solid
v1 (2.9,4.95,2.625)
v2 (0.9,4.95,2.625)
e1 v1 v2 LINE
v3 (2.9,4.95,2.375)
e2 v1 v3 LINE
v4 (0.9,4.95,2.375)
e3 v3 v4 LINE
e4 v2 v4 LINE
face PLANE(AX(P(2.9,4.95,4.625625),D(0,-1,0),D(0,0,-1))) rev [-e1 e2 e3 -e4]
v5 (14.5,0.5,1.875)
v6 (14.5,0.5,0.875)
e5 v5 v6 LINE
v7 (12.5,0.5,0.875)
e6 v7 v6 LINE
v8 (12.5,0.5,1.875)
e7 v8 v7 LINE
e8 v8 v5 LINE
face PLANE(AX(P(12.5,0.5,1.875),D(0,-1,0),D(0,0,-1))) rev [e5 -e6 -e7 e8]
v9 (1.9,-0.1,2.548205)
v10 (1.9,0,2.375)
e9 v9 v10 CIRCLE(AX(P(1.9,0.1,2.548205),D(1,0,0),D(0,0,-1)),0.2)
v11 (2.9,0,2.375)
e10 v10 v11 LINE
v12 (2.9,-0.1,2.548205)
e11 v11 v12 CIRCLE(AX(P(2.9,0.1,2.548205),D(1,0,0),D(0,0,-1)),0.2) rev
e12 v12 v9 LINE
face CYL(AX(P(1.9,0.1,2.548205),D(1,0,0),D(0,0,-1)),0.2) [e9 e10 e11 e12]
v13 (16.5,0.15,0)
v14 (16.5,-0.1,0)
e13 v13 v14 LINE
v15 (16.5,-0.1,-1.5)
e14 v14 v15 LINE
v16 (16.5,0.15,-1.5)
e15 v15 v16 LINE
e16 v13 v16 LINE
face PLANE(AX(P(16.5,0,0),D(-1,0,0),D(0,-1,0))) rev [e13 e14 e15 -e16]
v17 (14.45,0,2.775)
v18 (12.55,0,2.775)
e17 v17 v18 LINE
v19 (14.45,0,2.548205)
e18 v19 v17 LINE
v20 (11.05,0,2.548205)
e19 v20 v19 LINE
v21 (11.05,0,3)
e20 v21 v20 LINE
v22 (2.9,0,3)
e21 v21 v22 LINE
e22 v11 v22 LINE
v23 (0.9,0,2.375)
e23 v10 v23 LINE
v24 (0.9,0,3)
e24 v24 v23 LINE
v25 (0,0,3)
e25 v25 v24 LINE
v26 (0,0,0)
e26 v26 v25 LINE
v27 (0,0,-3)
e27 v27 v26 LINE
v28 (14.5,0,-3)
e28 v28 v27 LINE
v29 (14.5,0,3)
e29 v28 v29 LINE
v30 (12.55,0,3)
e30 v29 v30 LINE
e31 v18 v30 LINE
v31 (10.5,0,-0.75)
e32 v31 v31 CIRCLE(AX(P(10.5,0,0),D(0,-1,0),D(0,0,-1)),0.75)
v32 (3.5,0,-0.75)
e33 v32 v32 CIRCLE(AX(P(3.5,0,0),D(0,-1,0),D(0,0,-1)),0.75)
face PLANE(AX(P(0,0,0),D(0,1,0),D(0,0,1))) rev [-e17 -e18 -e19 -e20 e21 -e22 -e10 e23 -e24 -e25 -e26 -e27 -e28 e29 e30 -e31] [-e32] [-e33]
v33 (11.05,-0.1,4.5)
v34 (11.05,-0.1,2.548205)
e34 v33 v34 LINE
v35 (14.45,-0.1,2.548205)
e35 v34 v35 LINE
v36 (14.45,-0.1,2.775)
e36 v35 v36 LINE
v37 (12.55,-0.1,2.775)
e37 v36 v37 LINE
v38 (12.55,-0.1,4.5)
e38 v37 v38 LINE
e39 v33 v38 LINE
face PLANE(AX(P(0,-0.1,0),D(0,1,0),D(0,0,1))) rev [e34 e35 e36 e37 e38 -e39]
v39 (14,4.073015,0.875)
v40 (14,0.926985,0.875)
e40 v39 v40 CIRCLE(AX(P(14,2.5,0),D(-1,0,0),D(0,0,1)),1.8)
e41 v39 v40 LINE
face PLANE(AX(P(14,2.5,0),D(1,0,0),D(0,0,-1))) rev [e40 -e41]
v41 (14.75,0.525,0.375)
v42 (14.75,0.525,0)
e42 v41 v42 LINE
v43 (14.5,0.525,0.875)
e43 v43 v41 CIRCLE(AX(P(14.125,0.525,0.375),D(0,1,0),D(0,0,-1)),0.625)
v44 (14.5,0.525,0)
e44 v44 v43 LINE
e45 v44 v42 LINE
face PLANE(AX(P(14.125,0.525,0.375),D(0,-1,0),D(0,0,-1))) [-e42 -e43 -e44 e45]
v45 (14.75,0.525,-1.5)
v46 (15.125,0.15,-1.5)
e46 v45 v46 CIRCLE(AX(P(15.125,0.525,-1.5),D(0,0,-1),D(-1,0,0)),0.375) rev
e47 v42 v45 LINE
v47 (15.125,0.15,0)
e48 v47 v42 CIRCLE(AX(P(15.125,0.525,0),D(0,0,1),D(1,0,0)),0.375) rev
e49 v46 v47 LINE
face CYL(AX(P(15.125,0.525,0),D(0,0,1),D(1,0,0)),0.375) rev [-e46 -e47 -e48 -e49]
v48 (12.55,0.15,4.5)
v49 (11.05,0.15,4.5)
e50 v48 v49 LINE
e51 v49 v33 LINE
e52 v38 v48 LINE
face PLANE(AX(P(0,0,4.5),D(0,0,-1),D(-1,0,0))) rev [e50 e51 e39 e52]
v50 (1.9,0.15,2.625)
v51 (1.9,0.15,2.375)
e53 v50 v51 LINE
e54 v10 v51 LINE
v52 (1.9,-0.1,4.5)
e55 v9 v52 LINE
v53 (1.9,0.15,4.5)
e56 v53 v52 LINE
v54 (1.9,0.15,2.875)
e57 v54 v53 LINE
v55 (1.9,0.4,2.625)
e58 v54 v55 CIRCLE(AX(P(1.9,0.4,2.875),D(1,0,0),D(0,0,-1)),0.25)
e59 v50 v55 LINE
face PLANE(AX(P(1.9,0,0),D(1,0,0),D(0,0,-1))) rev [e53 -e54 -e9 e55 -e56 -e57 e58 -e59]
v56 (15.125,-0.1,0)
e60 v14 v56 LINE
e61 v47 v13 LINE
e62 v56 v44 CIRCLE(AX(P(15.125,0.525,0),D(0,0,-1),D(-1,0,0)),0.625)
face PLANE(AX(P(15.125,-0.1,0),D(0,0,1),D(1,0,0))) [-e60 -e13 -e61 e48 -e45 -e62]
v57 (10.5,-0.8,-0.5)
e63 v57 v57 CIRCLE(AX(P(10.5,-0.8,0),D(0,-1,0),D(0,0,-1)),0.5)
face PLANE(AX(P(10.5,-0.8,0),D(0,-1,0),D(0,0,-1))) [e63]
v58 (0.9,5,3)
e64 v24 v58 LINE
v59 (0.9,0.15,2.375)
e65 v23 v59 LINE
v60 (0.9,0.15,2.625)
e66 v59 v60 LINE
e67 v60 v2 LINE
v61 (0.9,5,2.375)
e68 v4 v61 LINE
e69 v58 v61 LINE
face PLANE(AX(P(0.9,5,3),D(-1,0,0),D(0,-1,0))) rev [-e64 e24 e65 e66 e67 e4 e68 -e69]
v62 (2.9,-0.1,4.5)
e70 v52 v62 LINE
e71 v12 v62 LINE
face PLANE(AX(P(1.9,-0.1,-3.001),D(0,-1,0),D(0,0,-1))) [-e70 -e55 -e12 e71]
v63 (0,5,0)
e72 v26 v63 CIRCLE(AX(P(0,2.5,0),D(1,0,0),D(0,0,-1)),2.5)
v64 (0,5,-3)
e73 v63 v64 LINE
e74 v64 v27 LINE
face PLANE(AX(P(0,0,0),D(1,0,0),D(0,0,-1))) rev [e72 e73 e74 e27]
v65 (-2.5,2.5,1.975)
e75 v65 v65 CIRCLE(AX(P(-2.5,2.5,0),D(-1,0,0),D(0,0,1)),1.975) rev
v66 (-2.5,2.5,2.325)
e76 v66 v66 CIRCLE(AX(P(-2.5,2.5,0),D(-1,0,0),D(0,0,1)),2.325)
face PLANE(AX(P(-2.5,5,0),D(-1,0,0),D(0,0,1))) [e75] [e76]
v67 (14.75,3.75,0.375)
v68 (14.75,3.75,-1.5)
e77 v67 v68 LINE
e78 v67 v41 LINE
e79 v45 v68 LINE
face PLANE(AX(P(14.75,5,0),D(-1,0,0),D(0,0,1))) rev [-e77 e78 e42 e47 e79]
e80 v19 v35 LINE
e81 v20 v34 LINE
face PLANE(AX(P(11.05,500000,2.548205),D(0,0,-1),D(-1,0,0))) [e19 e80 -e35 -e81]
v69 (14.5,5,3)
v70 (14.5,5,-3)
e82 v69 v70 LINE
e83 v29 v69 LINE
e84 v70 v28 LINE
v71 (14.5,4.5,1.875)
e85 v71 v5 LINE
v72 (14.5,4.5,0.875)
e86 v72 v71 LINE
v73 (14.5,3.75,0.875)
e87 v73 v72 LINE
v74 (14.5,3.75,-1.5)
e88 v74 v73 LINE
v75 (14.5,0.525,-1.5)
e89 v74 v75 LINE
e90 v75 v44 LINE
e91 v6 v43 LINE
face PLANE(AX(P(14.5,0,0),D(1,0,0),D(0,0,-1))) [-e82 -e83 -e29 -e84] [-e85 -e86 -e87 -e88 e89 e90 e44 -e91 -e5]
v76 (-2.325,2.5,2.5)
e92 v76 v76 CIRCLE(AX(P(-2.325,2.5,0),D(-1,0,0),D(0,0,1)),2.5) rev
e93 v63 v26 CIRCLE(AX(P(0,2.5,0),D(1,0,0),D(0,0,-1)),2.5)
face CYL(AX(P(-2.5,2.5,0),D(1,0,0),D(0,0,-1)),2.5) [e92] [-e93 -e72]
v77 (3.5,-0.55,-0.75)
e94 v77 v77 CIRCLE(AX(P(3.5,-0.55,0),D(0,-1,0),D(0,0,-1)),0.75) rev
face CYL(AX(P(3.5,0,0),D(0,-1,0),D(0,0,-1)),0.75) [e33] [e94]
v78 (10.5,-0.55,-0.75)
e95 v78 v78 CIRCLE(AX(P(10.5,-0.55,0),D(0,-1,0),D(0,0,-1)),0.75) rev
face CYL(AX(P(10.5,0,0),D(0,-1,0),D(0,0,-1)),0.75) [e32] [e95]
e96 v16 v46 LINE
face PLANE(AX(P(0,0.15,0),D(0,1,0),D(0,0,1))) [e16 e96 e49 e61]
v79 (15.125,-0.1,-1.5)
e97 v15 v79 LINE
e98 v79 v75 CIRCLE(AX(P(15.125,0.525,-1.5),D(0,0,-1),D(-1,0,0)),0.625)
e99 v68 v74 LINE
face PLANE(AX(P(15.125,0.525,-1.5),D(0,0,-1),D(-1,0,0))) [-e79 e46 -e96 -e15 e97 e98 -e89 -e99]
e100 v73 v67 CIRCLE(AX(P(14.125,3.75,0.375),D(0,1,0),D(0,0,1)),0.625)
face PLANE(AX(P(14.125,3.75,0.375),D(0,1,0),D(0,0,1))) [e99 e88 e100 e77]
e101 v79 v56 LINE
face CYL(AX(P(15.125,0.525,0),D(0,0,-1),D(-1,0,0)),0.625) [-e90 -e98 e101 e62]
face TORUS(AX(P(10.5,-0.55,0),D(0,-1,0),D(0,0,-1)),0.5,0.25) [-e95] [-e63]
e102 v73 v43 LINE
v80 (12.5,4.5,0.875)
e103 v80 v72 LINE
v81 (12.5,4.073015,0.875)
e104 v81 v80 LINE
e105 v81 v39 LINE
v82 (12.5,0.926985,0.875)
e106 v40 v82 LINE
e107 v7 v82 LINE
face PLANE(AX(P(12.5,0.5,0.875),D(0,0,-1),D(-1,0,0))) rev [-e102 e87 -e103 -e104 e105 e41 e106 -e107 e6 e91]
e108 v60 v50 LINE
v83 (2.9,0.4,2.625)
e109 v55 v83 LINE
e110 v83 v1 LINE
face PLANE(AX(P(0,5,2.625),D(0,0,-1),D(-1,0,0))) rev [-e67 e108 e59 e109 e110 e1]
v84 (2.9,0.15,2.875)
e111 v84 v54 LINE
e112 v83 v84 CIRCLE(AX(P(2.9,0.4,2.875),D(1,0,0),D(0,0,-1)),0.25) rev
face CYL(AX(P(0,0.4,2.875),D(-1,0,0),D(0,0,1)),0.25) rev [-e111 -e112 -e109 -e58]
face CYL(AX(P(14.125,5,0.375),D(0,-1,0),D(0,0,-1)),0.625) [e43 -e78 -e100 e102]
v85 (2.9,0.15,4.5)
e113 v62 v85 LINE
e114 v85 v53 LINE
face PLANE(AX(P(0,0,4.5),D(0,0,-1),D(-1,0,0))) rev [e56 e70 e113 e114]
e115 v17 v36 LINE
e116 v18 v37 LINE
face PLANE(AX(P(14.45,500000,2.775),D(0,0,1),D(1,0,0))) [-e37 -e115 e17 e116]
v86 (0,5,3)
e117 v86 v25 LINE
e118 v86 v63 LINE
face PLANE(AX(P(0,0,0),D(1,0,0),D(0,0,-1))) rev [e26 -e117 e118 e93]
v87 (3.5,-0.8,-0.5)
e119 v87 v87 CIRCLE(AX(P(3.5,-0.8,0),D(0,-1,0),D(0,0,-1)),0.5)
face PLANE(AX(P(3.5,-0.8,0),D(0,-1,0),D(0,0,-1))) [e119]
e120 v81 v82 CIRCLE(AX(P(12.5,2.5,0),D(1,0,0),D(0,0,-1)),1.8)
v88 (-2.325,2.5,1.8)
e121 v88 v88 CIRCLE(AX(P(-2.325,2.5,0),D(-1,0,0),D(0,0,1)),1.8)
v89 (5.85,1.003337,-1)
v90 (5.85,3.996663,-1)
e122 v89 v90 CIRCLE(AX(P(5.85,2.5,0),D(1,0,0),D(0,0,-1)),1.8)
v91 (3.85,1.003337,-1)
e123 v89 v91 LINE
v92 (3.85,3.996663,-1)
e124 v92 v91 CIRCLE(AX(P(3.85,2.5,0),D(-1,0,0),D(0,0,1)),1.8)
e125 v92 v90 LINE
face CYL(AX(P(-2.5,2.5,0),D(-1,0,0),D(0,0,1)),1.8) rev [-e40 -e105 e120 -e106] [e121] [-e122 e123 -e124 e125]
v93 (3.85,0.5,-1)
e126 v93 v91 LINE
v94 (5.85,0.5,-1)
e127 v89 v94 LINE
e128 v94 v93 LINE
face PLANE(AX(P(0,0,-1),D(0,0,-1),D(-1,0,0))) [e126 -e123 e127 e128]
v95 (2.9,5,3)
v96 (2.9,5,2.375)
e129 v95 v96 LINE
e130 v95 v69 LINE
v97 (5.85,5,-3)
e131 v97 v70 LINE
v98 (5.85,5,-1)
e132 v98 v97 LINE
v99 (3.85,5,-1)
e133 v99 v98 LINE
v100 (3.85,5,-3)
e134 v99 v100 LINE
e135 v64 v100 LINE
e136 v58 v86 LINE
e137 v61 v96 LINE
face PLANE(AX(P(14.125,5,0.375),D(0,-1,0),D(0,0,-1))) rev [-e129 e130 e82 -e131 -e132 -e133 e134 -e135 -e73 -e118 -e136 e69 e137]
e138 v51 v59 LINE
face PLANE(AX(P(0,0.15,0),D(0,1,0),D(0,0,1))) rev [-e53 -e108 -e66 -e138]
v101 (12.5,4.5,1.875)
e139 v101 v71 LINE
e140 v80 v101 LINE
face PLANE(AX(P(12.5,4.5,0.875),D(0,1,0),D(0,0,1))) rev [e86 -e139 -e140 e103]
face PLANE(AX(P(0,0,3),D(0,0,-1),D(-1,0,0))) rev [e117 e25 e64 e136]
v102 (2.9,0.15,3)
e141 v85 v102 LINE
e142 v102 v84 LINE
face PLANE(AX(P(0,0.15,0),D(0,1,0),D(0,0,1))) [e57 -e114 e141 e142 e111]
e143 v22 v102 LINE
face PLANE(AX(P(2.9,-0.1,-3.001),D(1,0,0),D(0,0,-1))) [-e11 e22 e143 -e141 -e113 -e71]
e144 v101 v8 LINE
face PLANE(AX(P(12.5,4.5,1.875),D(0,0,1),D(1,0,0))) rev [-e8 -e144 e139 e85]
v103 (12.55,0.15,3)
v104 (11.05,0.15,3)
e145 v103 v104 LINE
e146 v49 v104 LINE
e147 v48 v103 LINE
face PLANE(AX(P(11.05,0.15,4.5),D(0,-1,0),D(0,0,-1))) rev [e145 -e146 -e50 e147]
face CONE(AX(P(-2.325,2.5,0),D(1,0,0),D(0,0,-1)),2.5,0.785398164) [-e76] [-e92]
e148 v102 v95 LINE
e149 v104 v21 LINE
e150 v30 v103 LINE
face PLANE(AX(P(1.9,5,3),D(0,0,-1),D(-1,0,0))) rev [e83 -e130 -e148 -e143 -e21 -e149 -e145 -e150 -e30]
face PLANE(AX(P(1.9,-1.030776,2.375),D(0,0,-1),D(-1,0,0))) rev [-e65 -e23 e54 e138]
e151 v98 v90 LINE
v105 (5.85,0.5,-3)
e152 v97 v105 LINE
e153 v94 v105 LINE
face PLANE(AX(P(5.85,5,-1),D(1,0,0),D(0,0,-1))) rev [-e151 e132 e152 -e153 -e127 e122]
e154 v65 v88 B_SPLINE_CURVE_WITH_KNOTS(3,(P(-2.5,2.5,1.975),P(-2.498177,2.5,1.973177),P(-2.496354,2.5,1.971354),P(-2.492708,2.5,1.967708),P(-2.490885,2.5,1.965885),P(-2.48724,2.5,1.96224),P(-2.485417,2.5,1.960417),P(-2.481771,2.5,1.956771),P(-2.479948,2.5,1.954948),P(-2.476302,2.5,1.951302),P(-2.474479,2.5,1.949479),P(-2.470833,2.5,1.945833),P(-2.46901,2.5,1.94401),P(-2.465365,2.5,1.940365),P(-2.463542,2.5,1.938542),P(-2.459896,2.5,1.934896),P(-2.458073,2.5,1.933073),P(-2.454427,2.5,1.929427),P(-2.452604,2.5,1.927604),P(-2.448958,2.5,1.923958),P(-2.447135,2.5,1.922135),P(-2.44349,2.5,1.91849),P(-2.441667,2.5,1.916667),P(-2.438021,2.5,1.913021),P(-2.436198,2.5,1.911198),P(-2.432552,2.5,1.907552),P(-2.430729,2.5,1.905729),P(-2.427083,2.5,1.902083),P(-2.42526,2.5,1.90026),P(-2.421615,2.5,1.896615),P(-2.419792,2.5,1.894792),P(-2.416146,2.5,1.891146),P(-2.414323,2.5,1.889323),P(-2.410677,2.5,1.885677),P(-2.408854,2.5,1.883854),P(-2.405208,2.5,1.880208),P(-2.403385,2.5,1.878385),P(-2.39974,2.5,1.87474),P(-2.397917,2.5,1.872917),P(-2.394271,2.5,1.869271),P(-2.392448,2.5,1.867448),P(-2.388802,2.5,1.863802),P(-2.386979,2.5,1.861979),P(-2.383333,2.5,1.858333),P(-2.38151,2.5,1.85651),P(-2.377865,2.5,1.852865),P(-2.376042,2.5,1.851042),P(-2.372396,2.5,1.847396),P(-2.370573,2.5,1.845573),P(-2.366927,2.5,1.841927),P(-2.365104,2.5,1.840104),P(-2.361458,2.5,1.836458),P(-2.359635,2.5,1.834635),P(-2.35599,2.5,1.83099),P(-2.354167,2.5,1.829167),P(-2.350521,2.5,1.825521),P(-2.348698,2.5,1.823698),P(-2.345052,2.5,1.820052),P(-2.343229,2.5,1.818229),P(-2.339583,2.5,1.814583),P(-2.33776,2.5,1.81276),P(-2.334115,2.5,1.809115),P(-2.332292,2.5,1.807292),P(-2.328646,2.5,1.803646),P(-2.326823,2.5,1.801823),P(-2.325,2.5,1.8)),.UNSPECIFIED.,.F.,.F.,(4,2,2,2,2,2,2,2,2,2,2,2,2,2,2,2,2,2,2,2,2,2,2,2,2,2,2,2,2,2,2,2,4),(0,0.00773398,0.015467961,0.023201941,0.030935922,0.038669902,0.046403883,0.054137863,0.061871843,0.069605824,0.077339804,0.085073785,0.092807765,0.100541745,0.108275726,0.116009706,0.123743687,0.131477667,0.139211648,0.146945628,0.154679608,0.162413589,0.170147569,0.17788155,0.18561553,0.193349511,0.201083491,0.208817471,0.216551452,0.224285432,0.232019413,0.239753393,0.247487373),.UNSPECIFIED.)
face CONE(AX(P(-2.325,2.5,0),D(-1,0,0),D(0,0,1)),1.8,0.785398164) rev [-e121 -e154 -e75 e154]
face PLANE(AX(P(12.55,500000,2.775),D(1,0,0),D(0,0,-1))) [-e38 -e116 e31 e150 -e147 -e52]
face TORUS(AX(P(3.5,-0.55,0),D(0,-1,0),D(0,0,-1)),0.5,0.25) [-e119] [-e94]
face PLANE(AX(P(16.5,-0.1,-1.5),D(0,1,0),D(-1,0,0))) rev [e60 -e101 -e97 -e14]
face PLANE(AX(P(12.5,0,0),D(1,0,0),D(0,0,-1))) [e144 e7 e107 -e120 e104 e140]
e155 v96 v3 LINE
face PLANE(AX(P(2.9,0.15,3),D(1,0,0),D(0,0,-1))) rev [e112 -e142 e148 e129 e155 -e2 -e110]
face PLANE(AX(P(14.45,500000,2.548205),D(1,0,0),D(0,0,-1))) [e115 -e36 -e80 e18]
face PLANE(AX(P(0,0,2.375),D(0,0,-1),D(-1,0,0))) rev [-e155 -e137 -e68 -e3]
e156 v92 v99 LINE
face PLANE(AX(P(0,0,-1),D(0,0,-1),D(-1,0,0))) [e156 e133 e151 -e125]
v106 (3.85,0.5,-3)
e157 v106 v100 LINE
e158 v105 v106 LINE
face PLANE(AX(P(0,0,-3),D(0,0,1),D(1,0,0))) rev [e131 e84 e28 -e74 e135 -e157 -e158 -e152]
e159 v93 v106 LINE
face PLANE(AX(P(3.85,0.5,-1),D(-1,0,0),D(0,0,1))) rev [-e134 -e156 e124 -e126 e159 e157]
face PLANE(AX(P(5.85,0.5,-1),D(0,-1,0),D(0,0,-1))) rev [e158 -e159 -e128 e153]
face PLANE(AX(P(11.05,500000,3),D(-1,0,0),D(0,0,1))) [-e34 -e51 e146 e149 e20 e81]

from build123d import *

# Parameters (mm, degrees)
SKETCH1_W            = 0.625
SKETCH1_H            = 1.5
REVOLVE1_ANGLE       = 90
BOSS_EXTRUDE1_DEPTH  = 4.475
SKETCH3_W            = 4.5
SKETCH3_H            = 4.475
BOSS_EXTRUDE2_DEPTH  = 12.6
SKETCH4_W            = 12.6
SKETCH4_H            = 4.5
BOSS_EXTRUDE3_DEPTH  = 0.525
SKETCH5_W            = 1.5
SKETCH5_H            = 5.1
BOSS_EXTRUDE4_DEPTH  = 1.375
SKETCH6_W            = 1.75
SKETCH6_H            = 1.5
CUT_EXTRUDE1_DEPTH   = 4.475
SKETCH7_W            = 1.75
SKETCH7_H            = 1.5
CUT_EXTRUDE2_DEPTH   = 0.375
CUT_EXTRUDE3_START   = -1.25
CUT_EXTRUDE3_DEPTH   = 1.25
SKETCH9_W            = 12.6
SKETCH9_H            = 5
BOSS_EXTRUDE5_DEPTH  = 1.5
BOSS_EXTRUDE6_START  = 1.9
BOSS_EXTRUDE6_DEPTH  = 1
SKETCH11_W           = 5.625
SKETCH11_H           = 5
BOSS_EXTRUDE7_DEPTH  = 1.9
SKETCH12_W           = 0.9
SKETCH12_H           = 5
BOSS_EXTRUDE8_DEPTH  = 0.375
CUT_EXTRUDE4_REACH   = 19.458
SKETCH14_W           = 1
SKETCH14_H           = 0.25
SKETCH15_W           = 1
SKETCH15_H           = 0.375
CUT_EXTRUDE5_DEPTH   = 4.85
SKETCH16_W           = 1
SKETCH16_H           = 0.25
BOSS_EXTRUDE9_DEPTH  = 1.5
BOSS_EXTRUDE10_REACH = 19.847
SKETCH18_W           = 1.5
SKETCH18_H           = 0.25
BOSS_EXTRUDE11_DEPTH = 1.5
SKETCH19_W           = 1
SKETCH19_H           = 4
CUT_EXTRUDE6_DEPTH   = 2
CUT_EXTRUDE7_REACH   = 20.059
SKETCH21_W           = 2
SKETCH21_H           = 0.05
SKETCH22_W           = 2
SKETCH22_H           = 4.5
CUT_EXTRUDE8_DEPTH   = 2
SKETCH23_W           = 2.5
SKETCH23_H           = 2.5
SKETCH24_W           = 0.75
SKETCH24_H           = 0.8
SKETCH25_W           = 0.75
SKETCH25_H           = 0.8
HOLE1_D              = 3.6
HOLE1_DEPTH          = 16.5
CHAMFER1_SIZE        = 0.175
FILLET1_R            = 0.25
FILLET2_R            = 0.375


# Read off the part's stored shape, not the designer's step: Boss-Extrude6
with BuildPart() as part:
    # Sketch1 → Revolve1 (revolve)
    with BuildSketch(Plane(origin=(0, 0.525, 0), x_dir=(1, 0, 0), z_dir=(0, 1, 0))):
        with Locations((14.8125, 0.75)):
            Rectangle(SKETCH1_W, SKETCH1_H)
    revolve(axis=Axis((15.125, 0.525, 0), (0, 0, 1)), revolution_arc=REVOLVE1_ANGLE)

    # Sketch2 → Boss-Extrude1 (add)
    with BuildSketch(Plane(origin=(0, 0.525, 0), x_dir=(-1, 0, 0), z_dir=(0, 1, 0))):
        with BuildLine():
            Line((-14.5, -1.5), (-15.125, -1.5))
            Line((-15.125, -1.5), (-15.125, 0))
            Line((-15.125, 0), (-14.75, 0))
            Line((-14.75, 0), (-14.75, 0.375))
            ThreePointArc((-14.75, 0.375), (-14.684016994, 0.654508497), (-14.5, 0.875))
            Line((-14.5, 0.875), (-14.5, -1.5))
        make_face()
    extrude(amount=BOSS_EXTRUDE1_DEPTH)

    # Sketch3 → Boss-Extrude2 (add)
    with BuildSketch(Plane.ZY.offset(-14.5)):
        with Locations((0.75, 2.7625)):
            Rectangle(SKETCH3_W, SKETCH3_H)
    extrude(amount=BOSS_EXTRUDE2_DEPTH)

    # Sketch4 → Boss-Extrude3 (add)
    with BuildSketch(Plane.XZ.offset(-0.525)):
        with Locations((8.2, 0.75)):
            Rectangle(SKETCH4_W, SKETCH4_H)
    extrude(amount=BOSS_EXTRUDE3_DEPTH)

    # Sketch5 → Boss-Extrude4 (add)
    with BuildSketch(Plane(origin=(15.125, 0, 0), x_dir=(0, 0, -1), z_dir=(1, 0, 0))):
        with Locations((0.75, 2.45)):
            Rectangle(SKETCH5_W, SKETCH5_H)
    extrude(amount=BOSS_EXTRUDE4_DEPTH)

    # Sketch6 → Cut-Extrude1 (cut)
    with BuildSketch(Plane(origin=(0, 5, 0), x_dir=(-1, 0, 0), z_dir=(0, 1, 0))):
        with Locations((-15.625, -0.75)):
            Rectangle(SKETCH6_W, SKETCH6_H)
    extrude(amount=-CUT_EXTRUDE1_DEPTH, mode=Mode.SUBTRACT)

    # Sketch7 → Cut-Extrude2 (cut)
    with BuildSketch(Plane(origin=(0, 0.525, 0), x_dir=(-1, 0, 0), z_dir=(0, 1, 0))):
        with Locations((-15.625, -0.75)):
            Rectangle(SKETCH7_W, SKETCH7_H)
    extrude(amount=-CUT_EXTRUDE2_DEPTH, mode=Mode.SUBTRACT)

    # Sketch8 → Cut-Extrude3 (cut)
    with BuildSketch(Plane(origin=(0, 5, 0), x_dir=(-1, 0, 0), z_dir=(0, 1, 0)).offset(CUT_EXTRUDE3_START)):
        with BuildLine():
            Line((-14.75, -1.5), (-14.5, -1.5))
            Line((-14.5, -1.5), (-14.5, 0.875))
            ThreePointArc((-14.5, 0.875), (-14.684016994, 0.654508497), (-14.75, 0.375))
            Line((-14.75, 0.375), (-14.75, -1.5))
        make_face()
    extrude(amount=CUT_EXTRUDE3_DEPTH, mode=Mode.SUBTRACT)

    # Sketch9 → Boss-Extrude5 (add)
    with BuildSketch(Plane(origin=(0, 0, -1.5), x_dir=(-1, 0, 0), z_dir=(0, 0, -1))):
        with Locations((-8.2, 2.5)):
            Rectangle(SKETCH9_W, SKETCH9_H)
    extrude(amount=BOSS_EXTRUDE5_DEPTH)

    # Boss-Extrude6 outline → Boss-Extrude6 (add)
    with BuildSketch(Plane.YZ.offset(BOSS_EXTRUDE6_START)):
        with BuildLine():
            Line((0, 3), (-0.1, 3))
            Line((-0.1, 3), (-0.1, 2.548205081))
            ThreePointArc((-0.1, 2.548205081), (-0.073205081, 2.448205081), (0, 2.375))
            Line((0, 2.375), (0, 3))
        make_face()
    extrude(amount=BOSS_EXTRUDE6_DEPTH)

    # Sketch11 → Boss-Extrude7 (add)
    with BuildSketch(Plane.ZY.offset(-1.9)):
        with Locations((-0.1875, 2.5)):
            Rectangle(SKETCH11_W, SKETCH11_H)
    extrude(amount=BOSS_EXTRUDE7_DEPTH)

    # Sketch12 → Boss-Extrude8 (add)
    with BuildSketch(Plane.XY.offset(2.625)):
        with Locations((0.45, 2.5)):
            Rectangle(SKETCH12_W, SKETCH12_H)
    extrude(amount=BOSS_EXTRUDE8_DEPTH)

    # Sketch14 → Cut-Extrude4 (cut, up to next)
    with BuildSketch(Plane(origin=(0, 0.15, 0), x_dir=(1, 0, 0), z_dir=(0, 1, 0)), mode=Mode.PRIVATE) as cut_extrude4_sk1:
        with Locations((1.4, -2.5)):
            Rectangle(SKETCH14_W, SKETCH14_H)
    cut_extrude4_tool1 = extrude(cut_extrude4_sk1.sketch, amount=-CUT_EXTRUDE4_REACH, mode=Mode.PRIVATE) & part.part
    add(cut_extrude4_tool1.solids().sort_by_distance((1.4, 0.15, 2.5))[0], mode=Mode.SUBTRACT)

    # Sketch15 → Cut-Extrude5 (cut)
    with BuildSketch(Plane(origin=(0, 5, 0), x_dir=(-1, 0, 0), z_dir=(0, 1, 0))):
        with Locations((-2.4, 2.8125)):
            Rectangle(SKETCH15_W, SKETCH15_H)
    extrude(amount=-CUT_EXTRUDE5_DEPTH, mode=Mode.SUBTRACT)

    # Sketch16 → Boss-Extrude9 (add)
    with BuildSketch(Plane.XY.offset(3)):
        with Locations((2.4, 0.025)):
            Rectangle(SKETCH16_W, SKETCH16_H)
    extrude(amount=BOSS_EXTRUDE9_DEPTH)

    # Sketch17 → Boss-Extrude10 (add, up to next)
    with BuildSketch(Plane.XZ.offset(0.1), mode=Mode.PRIVATE) as boss_extrude10_sk1:
        Polygon((12.55, 2.775), (12.55, 3), (11.05, 3), (11.05, 2.548205081), (14.45, 2.548205081), (14.45, 2.775), align=None)
    boss_extrude10_tool1 = extrude(boss_extrude10_sk1.sketch, amount=-BOSS_EXTRUDE10_REACH, mode=Mode.PRIVATE) - part.part
    add(boss_extrude10_tool1.solids().sort_by_distance((12.460785, -0.1, 2.730374))[0])

    # Sketch18 → Boss-Extrude11 (add)
    with BuildSketch(Plane.XY.offset(3)):
        with Locations((11.8, 0.025)):
            Rectangle(SKETCH18_W, SKETCH18_H)
    extrude(amount=BOSS_EXTRUDE11_DEPTH)

    # Sketch19 → Cut-Extrude6 (cut)
    with BuildSketch(Plane(origin=(14.5, 0, 0), x_dir=(0, 0, -1), z_dir=(1, 0, 0))):
        with Locations((-1.375, 2.5)):
            Rectangle(SKETCH19_W, SKETCH19_H)
    extrude(amount=-CUT_EXTRUDE6_DEPTH, mode=Mode.SUBTRACT)

    # Sketch21 → Cut-Extrude7 (cut, up to next)
    with BuildSketch(Plane(origin=(0, 0, 2.375), x_dir=(-1, 0, 0), z_dir=(0, 0, -1)), mode=Mode.PRIVATE) as cut_extrude7_sk1:
        with Locations((-1.9, 4.975)):
            Rectangle(SKETCH21_W, SKETCH21_H)
    cut_extrude7_tool1 = extrude(cut_extrude7_sk1.sketch, amount=-CUT_EXTRUDE7_REACH, mode=Mode.PRIVATE) & part.part
    add(cut_extrude7_tool1.solids().sort_by_distance((1.9, 4.975, 2.375))[0], mode=Mode.SUBTRACT)

    # Sketch22 → Cut-Extrude8 (cut)
    with BuildSketch(Plane(origin=(0, 0, -3), x_dir=(-1, 0, 0), z_dir=(0, 0, -1))):
        with Locations((-4.85, 2.75)):
            Rectangle(SKETCH22_W, SKETCH22_H)
    extrude(amount=-CUT_EXTRUDE8_DEPTH, mode=Mode.SUBTRACT)

    # Sketch23 → Revolve2 (revolve)
    with BuildSketch(Plane.XY, mode=Mode.PRIVATE) as revolve2_sk:
        with Locations((-1.25, 3.75)):
            Rectangle(SKETCH23_W, SKETCH23_H)
    revolve(revolve2_sk.sketch.rotate(Axis((-2.5, 2.5, 0), (1, 0, 0)), 270), axis=Axis((-2.5, 2.5, 0), (1, 0, 0)))

    # Sketch24 → Revolve3 (revolve)
    with BuildSketch(Plane.XY, mode=Mode.PRIVATE) as revolve3_sk:
        with Locations((3.875, -0.4)):
            Rectangle(SKETCH24_W, SKETCH24_H)
    revolve(revolve3_sk.sketch.rotate(Axis((3.5, 0, 0), (0, -1, 0)), 270), axis=Axis((3.5, 0, 0), (0, -1, 0)))

    # Sketch25 → Revolve4 (revolve)
    with BuildSketch(Plane.XY, mode=Mode.PRIVATE) as revolve4_sk:
        with Locations((10.875, -0.4)):
            Rectangle(SKETCH25_W, SKETCH25_H)
    revolve(revolve4_sk.sketch.rotate(Axis((10.5, 0, 0), (0, -1, 0)), 270), axis=Axis((10.5, 0, 0), (0, -1, 0)))

    # Hole1
    with Locations(Plane.ZY.offset(2.5)):
        with Locations((0, 2.5)):
            Hole(HOLE1_D / 2, depth=HOLE1_DEPTH)

    # Chamfer1
    chamfer1_edges = [part.edges().sort_by_distance(p)[0] for p in [
        (-2.5, 2.5, 2.5),
        (-2.5, 2.5, 1.8),
    ]]
    chamfer(chamfer1_edges, length=CHAMFER1_SIZE)

    # Fillet1
    fillet1_edges = [part.edges().sort_by_distance(p)[0] for p in [
        (2.4, 0.15, 2.625),
        (3.5, -0.8, 0.75),
        (10.5, -0.8, 0.75),
    ]]
    fillet(fillet1_edges, radius=FILLET1_R)

    # Fillet2
    fillet2_edges = [part.edges().sort_by_distance(p)[0] for p in [
        (14.75, 0.15, -0.75),
    ]]
    fillet(fillet2_edges, radius=FILLET2_R)


solid = part.part
